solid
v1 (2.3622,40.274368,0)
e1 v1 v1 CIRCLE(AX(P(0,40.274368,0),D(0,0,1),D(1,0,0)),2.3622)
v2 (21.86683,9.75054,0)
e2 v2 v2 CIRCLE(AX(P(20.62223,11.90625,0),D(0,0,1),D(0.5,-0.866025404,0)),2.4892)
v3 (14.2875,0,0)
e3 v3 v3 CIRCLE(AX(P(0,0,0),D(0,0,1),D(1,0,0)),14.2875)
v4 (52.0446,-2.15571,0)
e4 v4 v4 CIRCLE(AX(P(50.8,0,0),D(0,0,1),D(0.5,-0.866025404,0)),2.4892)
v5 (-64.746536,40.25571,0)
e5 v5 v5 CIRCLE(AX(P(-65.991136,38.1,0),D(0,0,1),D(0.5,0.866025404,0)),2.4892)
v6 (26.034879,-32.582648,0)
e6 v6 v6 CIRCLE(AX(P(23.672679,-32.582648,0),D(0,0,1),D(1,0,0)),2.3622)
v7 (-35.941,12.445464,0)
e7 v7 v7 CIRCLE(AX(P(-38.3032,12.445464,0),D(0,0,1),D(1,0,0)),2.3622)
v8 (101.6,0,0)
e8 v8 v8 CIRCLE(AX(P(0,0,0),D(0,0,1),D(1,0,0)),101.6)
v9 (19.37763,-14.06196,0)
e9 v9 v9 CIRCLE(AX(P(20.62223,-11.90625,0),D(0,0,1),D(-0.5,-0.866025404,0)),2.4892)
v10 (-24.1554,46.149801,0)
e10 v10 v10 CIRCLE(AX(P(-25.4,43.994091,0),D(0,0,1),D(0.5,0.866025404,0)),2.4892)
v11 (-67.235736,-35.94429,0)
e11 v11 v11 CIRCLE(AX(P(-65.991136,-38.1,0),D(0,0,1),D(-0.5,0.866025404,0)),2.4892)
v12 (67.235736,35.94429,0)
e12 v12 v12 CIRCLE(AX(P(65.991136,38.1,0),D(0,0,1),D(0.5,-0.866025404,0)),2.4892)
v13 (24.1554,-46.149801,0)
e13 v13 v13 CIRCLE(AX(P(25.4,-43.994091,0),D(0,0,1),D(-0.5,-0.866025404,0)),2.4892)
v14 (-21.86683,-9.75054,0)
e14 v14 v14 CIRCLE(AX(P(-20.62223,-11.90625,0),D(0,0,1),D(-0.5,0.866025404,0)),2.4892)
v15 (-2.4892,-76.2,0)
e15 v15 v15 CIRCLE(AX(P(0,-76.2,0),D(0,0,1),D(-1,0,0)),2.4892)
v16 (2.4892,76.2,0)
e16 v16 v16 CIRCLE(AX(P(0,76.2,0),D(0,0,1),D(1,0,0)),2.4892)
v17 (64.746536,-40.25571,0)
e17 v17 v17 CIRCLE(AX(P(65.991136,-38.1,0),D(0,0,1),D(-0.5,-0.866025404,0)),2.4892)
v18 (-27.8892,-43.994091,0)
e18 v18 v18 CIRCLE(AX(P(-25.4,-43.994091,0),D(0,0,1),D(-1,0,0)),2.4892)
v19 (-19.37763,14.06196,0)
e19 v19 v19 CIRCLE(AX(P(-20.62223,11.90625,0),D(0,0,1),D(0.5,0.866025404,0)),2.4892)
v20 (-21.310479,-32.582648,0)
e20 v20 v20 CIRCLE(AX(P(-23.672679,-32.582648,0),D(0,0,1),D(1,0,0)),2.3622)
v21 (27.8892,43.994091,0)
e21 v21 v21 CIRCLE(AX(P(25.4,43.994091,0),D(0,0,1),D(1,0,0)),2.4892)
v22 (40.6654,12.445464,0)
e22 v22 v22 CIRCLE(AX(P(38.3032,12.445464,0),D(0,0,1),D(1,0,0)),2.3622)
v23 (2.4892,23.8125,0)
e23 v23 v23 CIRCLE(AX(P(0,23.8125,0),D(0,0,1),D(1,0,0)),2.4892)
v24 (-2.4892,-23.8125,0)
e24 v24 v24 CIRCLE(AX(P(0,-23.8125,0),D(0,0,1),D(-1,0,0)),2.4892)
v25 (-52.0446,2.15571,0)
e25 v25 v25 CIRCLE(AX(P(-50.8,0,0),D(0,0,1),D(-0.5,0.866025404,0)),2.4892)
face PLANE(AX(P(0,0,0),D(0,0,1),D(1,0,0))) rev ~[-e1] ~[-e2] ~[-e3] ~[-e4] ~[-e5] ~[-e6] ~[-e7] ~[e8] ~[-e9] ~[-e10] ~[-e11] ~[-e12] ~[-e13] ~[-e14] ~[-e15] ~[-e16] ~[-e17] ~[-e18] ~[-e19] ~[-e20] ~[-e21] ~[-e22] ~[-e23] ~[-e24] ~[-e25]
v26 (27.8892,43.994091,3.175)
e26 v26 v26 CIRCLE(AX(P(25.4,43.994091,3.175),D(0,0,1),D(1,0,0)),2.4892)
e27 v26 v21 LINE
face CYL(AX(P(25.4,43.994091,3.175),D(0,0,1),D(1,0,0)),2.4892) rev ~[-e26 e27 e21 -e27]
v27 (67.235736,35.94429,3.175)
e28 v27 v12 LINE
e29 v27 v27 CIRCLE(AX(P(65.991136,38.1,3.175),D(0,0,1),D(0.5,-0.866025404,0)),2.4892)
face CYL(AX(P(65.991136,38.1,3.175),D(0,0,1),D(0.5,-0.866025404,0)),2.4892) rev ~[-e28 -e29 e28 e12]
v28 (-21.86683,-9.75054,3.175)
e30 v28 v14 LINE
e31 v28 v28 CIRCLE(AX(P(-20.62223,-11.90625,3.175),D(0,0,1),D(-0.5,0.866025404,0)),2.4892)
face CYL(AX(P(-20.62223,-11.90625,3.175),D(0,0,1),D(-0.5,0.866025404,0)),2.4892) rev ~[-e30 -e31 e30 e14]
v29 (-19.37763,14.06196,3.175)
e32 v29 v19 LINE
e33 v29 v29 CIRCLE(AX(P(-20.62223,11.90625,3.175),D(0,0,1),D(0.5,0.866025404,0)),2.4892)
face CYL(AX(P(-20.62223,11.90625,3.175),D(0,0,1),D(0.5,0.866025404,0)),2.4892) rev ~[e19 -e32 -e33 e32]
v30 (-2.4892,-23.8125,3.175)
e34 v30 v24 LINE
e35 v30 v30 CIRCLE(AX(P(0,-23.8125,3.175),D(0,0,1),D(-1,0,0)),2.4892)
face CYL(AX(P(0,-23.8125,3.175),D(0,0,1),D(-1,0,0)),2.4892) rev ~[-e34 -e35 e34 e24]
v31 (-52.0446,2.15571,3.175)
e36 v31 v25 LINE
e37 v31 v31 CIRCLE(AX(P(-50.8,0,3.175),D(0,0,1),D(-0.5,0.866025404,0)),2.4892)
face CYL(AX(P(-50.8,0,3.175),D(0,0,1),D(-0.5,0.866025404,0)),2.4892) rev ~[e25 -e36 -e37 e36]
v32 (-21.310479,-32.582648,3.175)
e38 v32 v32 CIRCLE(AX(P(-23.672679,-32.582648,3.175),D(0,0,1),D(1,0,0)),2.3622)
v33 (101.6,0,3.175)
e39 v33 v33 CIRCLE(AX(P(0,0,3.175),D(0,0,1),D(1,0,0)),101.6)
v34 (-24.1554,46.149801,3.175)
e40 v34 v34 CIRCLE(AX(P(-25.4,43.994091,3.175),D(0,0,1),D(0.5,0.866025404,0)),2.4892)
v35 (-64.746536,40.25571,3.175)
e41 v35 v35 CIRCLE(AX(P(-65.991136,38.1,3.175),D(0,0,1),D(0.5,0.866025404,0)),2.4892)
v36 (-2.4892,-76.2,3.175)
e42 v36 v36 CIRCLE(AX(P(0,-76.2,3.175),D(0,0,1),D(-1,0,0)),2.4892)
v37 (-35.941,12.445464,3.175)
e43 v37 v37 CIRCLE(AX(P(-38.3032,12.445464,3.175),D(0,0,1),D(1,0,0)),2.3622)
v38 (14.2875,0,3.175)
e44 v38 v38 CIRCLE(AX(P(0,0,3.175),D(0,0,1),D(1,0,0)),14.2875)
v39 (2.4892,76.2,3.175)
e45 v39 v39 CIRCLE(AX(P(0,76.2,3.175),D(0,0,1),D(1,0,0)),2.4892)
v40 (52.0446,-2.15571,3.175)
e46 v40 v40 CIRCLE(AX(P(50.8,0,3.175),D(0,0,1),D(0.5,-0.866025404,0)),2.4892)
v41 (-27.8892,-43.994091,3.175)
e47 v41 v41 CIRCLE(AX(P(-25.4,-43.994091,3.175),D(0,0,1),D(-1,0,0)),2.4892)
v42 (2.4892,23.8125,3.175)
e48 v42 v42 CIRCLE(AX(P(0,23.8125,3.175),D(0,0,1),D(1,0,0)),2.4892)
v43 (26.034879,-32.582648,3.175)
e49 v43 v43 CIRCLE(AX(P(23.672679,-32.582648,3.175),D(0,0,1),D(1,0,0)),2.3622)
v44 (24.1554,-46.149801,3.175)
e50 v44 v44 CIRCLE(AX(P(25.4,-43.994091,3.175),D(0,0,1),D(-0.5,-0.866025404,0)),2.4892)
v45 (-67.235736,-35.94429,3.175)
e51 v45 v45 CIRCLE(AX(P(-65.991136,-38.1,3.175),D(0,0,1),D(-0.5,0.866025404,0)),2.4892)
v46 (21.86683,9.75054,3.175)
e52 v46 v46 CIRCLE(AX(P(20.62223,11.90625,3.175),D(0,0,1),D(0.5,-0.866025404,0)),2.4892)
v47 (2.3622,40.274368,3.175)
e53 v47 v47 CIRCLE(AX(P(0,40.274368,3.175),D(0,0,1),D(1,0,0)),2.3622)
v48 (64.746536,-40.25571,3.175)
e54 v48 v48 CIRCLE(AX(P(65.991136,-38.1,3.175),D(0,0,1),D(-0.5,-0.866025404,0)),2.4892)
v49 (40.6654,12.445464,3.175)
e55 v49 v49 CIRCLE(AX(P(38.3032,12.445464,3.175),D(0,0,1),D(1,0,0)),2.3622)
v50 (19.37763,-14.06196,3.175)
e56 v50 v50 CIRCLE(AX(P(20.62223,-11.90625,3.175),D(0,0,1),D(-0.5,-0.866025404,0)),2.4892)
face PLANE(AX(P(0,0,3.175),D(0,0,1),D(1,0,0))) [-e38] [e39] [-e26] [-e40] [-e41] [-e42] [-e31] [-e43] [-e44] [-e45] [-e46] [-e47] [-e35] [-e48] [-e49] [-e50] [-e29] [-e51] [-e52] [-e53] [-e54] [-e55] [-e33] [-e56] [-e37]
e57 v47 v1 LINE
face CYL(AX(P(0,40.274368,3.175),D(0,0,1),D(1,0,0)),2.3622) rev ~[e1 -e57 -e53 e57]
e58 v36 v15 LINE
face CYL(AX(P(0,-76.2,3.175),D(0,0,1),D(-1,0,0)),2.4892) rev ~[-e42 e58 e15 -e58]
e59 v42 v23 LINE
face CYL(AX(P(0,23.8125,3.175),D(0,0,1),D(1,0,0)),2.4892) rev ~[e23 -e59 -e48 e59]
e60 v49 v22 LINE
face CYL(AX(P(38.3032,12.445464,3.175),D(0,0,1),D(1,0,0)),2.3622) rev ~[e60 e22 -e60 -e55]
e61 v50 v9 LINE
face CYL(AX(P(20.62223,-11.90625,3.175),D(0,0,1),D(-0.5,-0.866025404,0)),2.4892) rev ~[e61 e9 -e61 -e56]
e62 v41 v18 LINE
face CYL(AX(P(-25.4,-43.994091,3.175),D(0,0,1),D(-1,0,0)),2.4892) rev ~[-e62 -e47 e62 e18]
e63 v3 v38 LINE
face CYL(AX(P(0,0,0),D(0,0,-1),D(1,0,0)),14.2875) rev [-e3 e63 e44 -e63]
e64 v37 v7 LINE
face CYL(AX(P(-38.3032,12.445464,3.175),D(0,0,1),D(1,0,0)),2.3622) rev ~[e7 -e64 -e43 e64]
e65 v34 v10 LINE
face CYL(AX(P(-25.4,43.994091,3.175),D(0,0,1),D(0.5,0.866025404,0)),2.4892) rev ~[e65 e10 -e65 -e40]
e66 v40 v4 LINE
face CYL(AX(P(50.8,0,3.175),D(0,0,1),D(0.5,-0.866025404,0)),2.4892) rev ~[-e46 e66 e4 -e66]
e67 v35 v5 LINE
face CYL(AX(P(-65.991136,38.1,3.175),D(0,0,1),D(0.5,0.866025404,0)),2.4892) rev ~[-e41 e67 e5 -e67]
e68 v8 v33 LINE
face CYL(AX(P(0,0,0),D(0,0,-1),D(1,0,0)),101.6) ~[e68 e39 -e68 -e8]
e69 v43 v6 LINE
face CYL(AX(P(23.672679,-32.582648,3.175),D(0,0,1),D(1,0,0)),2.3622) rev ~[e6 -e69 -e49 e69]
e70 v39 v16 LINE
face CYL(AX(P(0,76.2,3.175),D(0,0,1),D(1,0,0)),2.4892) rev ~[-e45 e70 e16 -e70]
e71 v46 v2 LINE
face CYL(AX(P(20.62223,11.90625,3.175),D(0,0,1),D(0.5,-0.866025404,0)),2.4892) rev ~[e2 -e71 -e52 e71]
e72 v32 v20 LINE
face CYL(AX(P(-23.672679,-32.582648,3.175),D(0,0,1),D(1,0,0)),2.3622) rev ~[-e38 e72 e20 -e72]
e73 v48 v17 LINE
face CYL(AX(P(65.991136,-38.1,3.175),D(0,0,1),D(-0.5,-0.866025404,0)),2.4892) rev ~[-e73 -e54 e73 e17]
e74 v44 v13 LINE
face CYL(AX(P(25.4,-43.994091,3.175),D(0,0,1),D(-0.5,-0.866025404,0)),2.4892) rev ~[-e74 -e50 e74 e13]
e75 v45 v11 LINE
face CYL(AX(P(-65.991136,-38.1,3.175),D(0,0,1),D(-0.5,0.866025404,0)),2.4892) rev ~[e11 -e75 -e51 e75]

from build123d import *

# Parameters (mm, degrees)
F0_R            = 101.6
F0_R_2          = 14.2875
F1_DEPTH        = 3.175
F2_R            = 2.4892
F3_DEPTH        = 3.176
F3_COPIES_COUNT = 6
F4_R            = 2.3622
F5_DEPTH        = 3.176


# Not quite as in the source:
# - a pattern or mirror of a feature is missing from the dataset's text; its kind, count and spacing are read off the source's solid


with BuildPart() as f1:
    # F0 (on Top) → F1 (new body)
    with BuildSketch(Plane.XY):
        Circle(F0_R)
        Circle(F0_R_2, mode=Mode.SUBTRACT)
    extrude(amount=F1_DEPTH)

    # F2 (on face) → F3 (cut, through all)
    with BuildSketch(Plane.XY.offset(3.175)):
        with Locations((0, 23.8125)):
            Circle(F2_R)
        with Locations((0, 76.2)):
            Circle(F2_R)
        with Locations((25.4, 43.9940905122)):
            Circle(F2_R)
    f3 = extrude(amount=-F3_DEPTH, mode=Mode.SUBTRACT)

    # F3_copies: F3 ×6 about axis
    f3_copies_axis = Axis((0, 0, 0), (0, 0, 1))
    for i in range(1, F3_COPIES_COUNT):
        add(f3.rotate(f3_copies_axis, i * 360 / F3_COPIES_COUNT), mode=Mode.SUBTRACT)

    # F4 (on face) → F5 (cut, through all)
    with BuildSketch(Plane.XY.offset(3.175)):
        with Locations((0, 40.2743678674)):
            Circle(F4_R)
        with Locations((38.3032, 12.4454641087)):
            Circle(F4_R)
        with Locations((23.6726794779, -32.5826480425)):
            Circle(F4_R)
        with Locations((-23.6726794779, -32.5826480425)):
            Circle(F4_R)
        with Locations((-38.3032, 12.4454641087)):
            Circle(F4_R)
    extrude(amount=-F5_DEPTH, mode=Mode.SUBTRACT)


solid = f1.part
